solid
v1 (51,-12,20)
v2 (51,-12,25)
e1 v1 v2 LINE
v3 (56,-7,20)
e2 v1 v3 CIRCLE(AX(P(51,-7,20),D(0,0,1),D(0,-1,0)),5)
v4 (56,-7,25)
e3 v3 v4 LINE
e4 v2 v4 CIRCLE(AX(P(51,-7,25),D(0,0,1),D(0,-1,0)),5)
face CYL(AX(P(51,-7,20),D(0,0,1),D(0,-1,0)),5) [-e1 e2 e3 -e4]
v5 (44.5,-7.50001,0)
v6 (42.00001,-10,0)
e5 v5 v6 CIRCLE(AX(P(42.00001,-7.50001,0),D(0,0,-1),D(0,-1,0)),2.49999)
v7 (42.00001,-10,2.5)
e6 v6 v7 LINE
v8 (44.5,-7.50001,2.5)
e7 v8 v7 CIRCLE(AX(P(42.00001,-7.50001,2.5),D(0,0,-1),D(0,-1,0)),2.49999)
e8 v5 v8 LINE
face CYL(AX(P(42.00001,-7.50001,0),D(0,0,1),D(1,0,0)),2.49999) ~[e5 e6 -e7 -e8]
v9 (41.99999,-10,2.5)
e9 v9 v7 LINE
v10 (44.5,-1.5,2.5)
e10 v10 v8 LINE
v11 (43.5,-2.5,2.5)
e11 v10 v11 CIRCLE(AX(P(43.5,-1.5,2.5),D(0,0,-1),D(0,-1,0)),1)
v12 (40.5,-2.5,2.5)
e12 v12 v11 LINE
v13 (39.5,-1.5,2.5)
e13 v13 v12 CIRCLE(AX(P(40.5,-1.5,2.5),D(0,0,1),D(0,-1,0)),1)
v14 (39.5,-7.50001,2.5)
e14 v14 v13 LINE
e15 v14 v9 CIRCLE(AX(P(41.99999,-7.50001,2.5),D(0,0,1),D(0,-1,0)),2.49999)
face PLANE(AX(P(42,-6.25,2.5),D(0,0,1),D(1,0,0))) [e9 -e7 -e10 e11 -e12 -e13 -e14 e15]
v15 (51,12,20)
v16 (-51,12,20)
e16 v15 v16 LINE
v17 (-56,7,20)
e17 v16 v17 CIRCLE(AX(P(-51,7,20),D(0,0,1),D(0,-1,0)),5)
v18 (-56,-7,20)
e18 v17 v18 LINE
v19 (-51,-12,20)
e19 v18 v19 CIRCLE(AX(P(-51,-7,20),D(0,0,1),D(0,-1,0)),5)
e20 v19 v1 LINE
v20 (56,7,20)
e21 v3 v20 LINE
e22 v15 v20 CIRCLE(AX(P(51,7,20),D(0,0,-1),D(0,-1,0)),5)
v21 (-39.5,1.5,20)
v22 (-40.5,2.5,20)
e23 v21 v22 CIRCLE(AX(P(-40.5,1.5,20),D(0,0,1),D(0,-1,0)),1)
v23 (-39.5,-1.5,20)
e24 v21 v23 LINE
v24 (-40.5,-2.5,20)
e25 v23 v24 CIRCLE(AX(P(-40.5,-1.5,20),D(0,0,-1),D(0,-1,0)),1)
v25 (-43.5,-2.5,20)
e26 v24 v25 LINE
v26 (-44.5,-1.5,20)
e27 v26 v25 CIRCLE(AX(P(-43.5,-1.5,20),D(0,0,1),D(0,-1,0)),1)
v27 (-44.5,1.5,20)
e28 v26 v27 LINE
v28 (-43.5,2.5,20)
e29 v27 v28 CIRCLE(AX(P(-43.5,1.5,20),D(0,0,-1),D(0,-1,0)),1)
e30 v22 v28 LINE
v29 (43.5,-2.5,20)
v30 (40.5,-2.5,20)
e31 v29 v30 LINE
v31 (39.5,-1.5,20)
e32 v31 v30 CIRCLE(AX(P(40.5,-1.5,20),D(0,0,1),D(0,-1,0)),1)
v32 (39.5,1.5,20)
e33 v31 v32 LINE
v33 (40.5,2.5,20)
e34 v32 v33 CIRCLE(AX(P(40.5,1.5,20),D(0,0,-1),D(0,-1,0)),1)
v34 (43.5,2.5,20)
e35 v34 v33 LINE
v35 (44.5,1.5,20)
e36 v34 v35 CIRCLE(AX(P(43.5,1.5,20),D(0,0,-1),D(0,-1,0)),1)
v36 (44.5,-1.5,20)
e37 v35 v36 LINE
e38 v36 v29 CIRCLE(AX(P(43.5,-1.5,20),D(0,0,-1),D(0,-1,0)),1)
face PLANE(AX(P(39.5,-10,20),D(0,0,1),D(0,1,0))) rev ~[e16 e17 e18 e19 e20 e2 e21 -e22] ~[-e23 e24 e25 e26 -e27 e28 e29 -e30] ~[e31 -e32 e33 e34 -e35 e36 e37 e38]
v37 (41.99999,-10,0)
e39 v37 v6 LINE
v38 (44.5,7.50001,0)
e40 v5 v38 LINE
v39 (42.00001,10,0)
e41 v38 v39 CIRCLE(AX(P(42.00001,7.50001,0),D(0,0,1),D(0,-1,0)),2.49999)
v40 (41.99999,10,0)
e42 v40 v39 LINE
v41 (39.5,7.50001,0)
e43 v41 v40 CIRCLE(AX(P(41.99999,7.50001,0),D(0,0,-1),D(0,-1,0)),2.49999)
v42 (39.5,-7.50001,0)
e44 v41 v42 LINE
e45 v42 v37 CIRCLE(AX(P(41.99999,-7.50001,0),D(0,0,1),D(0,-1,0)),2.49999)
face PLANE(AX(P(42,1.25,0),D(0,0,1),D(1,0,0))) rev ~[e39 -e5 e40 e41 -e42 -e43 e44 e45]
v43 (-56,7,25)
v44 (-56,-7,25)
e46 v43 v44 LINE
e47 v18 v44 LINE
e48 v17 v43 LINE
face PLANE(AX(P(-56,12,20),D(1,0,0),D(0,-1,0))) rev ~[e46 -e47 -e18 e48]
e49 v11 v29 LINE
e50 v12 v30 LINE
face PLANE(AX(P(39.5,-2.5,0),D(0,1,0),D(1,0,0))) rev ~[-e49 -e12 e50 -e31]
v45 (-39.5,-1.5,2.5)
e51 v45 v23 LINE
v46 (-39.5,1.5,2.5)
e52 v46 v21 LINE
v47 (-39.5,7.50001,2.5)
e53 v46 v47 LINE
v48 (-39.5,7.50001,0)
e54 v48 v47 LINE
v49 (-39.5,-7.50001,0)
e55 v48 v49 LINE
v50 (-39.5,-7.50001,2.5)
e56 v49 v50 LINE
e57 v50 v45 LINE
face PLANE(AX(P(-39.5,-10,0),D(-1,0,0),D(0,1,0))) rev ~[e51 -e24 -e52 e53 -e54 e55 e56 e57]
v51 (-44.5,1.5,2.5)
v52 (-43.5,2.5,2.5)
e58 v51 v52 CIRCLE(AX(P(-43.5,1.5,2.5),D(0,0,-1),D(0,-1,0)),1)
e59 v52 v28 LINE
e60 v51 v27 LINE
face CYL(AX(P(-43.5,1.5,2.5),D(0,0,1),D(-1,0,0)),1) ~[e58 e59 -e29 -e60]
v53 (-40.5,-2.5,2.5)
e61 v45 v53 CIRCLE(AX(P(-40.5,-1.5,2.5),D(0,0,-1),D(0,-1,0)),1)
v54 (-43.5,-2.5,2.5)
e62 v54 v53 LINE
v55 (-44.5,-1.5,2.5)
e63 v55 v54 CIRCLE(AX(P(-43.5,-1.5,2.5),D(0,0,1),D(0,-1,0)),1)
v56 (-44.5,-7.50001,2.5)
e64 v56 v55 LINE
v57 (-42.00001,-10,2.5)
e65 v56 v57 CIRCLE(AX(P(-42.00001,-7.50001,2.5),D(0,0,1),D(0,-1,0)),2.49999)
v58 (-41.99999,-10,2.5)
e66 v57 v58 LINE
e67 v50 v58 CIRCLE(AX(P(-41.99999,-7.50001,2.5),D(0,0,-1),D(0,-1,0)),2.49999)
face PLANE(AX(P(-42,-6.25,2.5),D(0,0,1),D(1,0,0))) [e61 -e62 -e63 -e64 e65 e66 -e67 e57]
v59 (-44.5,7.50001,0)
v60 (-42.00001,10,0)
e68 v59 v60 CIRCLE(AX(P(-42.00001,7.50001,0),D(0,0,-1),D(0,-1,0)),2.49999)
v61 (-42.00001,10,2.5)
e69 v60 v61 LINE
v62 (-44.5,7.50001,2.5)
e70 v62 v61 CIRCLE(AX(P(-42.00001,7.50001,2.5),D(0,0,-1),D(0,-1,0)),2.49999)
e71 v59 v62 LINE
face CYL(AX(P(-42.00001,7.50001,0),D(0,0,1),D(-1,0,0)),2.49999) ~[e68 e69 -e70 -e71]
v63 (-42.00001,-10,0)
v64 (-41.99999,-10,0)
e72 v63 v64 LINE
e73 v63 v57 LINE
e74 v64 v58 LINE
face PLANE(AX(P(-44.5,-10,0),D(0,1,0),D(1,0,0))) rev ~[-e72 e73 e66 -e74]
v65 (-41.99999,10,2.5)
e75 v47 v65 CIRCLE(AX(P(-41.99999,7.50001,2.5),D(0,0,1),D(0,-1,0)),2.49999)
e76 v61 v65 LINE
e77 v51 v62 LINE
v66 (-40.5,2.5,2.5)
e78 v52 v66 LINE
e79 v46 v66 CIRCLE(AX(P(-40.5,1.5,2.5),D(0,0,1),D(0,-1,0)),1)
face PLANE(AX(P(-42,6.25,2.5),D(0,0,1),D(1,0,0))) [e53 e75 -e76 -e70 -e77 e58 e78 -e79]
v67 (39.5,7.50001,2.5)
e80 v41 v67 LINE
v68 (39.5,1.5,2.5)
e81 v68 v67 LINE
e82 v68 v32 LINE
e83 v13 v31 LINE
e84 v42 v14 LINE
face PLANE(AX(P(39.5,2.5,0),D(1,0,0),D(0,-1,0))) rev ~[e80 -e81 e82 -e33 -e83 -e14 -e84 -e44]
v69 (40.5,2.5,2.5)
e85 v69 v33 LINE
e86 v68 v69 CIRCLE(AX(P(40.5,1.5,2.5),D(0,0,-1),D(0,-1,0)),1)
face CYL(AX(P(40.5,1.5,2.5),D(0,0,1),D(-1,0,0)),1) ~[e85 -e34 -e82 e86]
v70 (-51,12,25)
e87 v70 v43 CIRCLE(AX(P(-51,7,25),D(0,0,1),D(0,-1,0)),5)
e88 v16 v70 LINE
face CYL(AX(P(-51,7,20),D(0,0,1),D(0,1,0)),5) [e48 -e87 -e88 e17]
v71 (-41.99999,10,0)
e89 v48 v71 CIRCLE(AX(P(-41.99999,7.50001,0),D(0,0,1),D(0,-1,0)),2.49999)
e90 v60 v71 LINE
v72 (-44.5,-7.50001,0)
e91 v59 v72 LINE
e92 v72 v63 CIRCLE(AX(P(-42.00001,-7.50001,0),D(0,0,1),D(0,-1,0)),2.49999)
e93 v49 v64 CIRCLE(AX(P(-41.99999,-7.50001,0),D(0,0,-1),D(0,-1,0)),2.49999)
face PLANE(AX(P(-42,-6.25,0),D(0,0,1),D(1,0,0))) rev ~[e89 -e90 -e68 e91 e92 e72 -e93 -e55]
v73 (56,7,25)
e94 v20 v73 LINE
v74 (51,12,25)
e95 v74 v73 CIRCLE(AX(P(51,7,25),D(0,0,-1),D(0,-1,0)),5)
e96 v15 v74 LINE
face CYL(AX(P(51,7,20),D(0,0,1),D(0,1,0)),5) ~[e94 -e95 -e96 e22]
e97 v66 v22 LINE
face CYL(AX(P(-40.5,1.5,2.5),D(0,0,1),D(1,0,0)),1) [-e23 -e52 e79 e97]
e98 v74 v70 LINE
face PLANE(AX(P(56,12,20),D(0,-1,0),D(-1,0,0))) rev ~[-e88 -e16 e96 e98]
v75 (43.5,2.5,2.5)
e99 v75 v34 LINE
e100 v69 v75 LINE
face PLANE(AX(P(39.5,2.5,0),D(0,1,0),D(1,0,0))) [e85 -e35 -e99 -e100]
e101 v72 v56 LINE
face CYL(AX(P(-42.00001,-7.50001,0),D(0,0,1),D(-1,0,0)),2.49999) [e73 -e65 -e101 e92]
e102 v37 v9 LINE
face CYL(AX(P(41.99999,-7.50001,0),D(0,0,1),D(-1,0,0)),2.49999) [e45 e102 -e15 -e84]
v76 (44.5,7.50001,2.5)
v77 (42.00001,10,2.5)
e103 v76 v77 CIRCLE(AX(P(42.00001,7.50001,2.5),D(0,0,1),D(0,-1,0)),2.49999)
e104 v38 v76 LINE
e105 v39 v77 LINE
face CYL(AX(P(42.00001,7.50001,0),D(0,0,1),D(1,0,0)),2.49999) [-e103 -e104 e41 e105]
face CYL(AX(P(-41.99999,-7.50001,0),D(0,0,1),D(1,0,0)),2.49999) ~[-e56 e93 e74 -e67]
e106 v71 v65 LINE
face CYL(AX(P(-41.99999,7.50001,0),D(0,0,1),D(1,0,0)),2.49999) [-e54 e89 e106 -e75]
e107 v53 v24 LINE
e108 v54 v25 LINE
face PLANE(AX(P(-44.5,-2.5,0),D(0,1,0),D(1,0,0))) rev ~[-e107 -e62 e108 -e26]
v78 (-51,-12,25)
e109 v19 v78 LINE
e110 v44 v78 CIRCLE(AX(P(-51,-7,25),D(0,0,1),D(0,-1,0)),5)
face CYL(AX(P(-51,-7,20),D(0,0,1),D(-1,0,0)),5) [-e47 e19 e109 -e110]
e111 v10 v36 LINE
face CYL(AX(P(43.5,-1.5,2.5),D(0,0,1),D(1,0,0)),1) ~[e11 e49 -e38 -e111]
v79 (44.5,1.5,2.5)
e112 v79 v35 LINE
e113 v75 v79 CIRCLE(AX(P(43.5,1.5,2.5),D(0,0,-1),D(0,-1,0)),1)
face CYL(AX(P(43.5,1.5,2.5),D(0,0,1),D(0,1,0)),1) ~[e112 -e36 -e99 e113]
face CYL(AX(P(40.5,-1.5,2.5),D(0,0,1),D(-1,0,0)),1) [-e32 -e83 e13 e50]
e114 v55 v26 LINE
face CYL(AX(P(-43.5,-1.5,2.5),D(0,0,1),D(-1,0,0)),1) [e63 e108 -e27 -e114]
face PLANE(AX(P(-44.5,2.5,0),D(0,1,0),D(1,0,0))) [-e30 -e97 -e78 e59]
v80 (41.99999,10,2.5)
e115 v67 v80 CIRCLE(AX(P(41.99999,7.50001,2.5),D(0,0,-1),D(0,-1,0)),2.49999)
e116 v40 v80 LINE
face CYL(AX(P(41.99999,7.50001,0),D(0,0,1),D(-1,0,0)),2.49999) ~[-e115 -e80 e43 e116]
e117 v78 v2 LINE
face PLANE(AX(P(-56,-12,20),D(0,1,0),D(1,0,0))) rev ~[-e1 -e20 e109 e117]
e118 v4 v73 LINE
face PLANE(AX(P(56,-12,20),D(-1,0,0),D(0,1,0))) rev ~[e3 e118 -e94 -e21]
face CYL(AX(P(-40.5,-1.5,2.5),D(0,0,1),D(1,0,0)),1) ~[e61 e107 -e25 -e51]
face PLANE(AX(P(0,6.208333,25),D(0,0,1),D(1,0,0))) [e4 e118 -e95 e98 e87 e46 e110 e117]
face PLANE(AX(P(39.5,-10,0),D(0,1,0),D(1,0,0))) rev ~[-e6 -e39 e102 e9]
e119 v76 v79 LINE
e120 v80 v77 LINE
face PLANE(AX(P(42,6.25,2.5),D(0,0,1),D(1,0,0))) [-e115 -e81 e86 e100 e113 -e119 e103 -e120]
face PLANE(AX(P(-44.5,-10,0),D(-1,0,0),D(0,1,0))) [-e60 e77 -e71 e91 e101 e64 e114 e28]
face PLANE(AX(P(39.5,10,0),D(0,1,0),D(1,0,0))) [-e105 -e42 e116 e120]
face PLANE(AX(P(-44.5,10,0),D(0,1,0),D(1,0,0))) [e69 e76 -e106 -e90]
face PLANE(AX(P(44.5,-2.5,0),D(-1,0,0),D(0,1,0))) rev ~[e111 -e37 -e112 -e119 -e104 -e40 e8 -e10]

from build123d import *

# Parameters (mm, degrees)
F1_START = 20
F1_DEPTH = 5
F2_DEPTH = 5
F3_R     = 5
F0_W     = 5
F0_H     = 2.5
F4_DEPTH = 25
F0_H_2   = 7.5
F5_DEPTH = 2.5
F6_R     = 1
F7_R     = 2.49999
F8_R     = 2.49999


# Not quite as in the source:
# - a fillet or chamfer is up to 0.001 mm smaller than in the source, because OpenCascade refuses the exact size


with BuildPart() as f1:
    # F0 (on Top) → F1 (new body)
    with BuildSketch(Plane.XY.offset(F1_START)):
        Polygon((56, 0), (56, 12), (-56, 12), (-56, 0), (-44.5, 0), (-44.5, 2.5), (-44.5, 10), (-39.5, 10), (-39.5, 2.5), (-39.5, 0), (-28, 0), (0, 0), (28, 0), (39.5, 0), (39.5, 2.5), (39.5, 10), (44.5, 10), (44.5, 2.5), (44.5, 0), align=None)
        Polygon((56, -12), (56, 0), (44.5, 0), (44.5, -2.5), (44.5, -10), (39.5, -10), (39.5, -2.5), (39.5, 0), (28, 0), (0, 0), (-28, 0), (-39.5, 0), (-39.5, -2.5), (-39.5, -10), (-44.5, -10), (-44.5, -2.5), (-44.5, 0), (-56, 0), (-56, -12), align=None)
    extrude(amount=F1_DEPTH)

    # F2 (add): faces of the model
    f2_faces = [f1.faces().sort_by_distance(p)[0] for p in [
        (39.5, 0, 22.5),
        (-44.5, 0, 22.5),
    ]]
    extrude(f2_faces, amount=F2_DEPTH)

    # F3
    f3_edges = [f1.edges().sort_by_distance(p)[0] for p in [
        (56, -12, 22.5),
        (56, 12, 22.5),
        (-56, -12, 22.5),
        (-56, 12, 22.5),
    ]]
    fillet(f3_edges, radius=F3_R)

    # F0 (on Top) → F4 (join)
    with BuildSketch(Plane.XY):
        with Locations((-42, -1.25)):
            Rectangle(F0_W, F0_H)
        with Locations((-42, 1.25)):
            Rectangle(F0_W, F0_H)
        with Locations((42, 1.25)):
            Rectangle(F0_W, F0_H)
        with Locations((42, -1.25)):
            Rectangle(F0_W, F0_H)
    extrude(amount=F4_DEPTH)

    # F0 (on Top) → F5 (join)
    with BuildSketch(Plane.XY):
        with Locations((-42, -6.25)):
            Rectangle(F0_W, F0_H_2)
        with Locations((-42, 6.25)):
            Rectangle(F0_W, F0_H_2)
        with Locations((42, 6.25)):
            Rectangle(F0_W, F0_H_2)
        with Locations((42, -6.25)):
            Rectangle(F0_W, F0_H_2)
    extrude(amount=F5_DEPTH)

    # F6
    f6_edges = [f1.edges().sort_by_distance(p)[0] for p in [
        (44.5, -2.5, 11.25),
        (39.5, -2.5, 11.25),
        (44.5, 2.5, 11.25),
        (39.5, 2.5, 11.25),
        (-39.5, 2.5, 11.25),
        (-44.5, 2.5, 11.25),
        (-44.5, -2.5, 11.25),
        (-39.5, -2.5, 11.25),
    ]]
    fillet(f6_edges, radius=F6_R)

    # F7 (radius 2.5 in the source; OpenCascade refuses exactly that, so slightly less here)
    f7_edges = [f1.edges().sort_by_distance(p)[0] for p in [
        (-39.5, -10, 1.25),
        (-44.5, -10, 1.25),
        (-39.5, 10, 1.25),
        (-44.5, 10, 1.25),
    ]]
    fillet(f7_edges, radius=F7_R)

    # F8 (radius 2.5 in the source; OpenCascade refuses exactly that, so slightly less here)
    f8_edges = [f1.edges().sort_by_distance(p)[0] for p in [
        (39.5, -10, 1.25),
        (44.5, -10, 1.25),
        (44.5, 10, 1.25),
        (39.5, 10, 1.25),
    ]]
    fillet(f8_edges, radius=F8_R)


solid = f1.part
